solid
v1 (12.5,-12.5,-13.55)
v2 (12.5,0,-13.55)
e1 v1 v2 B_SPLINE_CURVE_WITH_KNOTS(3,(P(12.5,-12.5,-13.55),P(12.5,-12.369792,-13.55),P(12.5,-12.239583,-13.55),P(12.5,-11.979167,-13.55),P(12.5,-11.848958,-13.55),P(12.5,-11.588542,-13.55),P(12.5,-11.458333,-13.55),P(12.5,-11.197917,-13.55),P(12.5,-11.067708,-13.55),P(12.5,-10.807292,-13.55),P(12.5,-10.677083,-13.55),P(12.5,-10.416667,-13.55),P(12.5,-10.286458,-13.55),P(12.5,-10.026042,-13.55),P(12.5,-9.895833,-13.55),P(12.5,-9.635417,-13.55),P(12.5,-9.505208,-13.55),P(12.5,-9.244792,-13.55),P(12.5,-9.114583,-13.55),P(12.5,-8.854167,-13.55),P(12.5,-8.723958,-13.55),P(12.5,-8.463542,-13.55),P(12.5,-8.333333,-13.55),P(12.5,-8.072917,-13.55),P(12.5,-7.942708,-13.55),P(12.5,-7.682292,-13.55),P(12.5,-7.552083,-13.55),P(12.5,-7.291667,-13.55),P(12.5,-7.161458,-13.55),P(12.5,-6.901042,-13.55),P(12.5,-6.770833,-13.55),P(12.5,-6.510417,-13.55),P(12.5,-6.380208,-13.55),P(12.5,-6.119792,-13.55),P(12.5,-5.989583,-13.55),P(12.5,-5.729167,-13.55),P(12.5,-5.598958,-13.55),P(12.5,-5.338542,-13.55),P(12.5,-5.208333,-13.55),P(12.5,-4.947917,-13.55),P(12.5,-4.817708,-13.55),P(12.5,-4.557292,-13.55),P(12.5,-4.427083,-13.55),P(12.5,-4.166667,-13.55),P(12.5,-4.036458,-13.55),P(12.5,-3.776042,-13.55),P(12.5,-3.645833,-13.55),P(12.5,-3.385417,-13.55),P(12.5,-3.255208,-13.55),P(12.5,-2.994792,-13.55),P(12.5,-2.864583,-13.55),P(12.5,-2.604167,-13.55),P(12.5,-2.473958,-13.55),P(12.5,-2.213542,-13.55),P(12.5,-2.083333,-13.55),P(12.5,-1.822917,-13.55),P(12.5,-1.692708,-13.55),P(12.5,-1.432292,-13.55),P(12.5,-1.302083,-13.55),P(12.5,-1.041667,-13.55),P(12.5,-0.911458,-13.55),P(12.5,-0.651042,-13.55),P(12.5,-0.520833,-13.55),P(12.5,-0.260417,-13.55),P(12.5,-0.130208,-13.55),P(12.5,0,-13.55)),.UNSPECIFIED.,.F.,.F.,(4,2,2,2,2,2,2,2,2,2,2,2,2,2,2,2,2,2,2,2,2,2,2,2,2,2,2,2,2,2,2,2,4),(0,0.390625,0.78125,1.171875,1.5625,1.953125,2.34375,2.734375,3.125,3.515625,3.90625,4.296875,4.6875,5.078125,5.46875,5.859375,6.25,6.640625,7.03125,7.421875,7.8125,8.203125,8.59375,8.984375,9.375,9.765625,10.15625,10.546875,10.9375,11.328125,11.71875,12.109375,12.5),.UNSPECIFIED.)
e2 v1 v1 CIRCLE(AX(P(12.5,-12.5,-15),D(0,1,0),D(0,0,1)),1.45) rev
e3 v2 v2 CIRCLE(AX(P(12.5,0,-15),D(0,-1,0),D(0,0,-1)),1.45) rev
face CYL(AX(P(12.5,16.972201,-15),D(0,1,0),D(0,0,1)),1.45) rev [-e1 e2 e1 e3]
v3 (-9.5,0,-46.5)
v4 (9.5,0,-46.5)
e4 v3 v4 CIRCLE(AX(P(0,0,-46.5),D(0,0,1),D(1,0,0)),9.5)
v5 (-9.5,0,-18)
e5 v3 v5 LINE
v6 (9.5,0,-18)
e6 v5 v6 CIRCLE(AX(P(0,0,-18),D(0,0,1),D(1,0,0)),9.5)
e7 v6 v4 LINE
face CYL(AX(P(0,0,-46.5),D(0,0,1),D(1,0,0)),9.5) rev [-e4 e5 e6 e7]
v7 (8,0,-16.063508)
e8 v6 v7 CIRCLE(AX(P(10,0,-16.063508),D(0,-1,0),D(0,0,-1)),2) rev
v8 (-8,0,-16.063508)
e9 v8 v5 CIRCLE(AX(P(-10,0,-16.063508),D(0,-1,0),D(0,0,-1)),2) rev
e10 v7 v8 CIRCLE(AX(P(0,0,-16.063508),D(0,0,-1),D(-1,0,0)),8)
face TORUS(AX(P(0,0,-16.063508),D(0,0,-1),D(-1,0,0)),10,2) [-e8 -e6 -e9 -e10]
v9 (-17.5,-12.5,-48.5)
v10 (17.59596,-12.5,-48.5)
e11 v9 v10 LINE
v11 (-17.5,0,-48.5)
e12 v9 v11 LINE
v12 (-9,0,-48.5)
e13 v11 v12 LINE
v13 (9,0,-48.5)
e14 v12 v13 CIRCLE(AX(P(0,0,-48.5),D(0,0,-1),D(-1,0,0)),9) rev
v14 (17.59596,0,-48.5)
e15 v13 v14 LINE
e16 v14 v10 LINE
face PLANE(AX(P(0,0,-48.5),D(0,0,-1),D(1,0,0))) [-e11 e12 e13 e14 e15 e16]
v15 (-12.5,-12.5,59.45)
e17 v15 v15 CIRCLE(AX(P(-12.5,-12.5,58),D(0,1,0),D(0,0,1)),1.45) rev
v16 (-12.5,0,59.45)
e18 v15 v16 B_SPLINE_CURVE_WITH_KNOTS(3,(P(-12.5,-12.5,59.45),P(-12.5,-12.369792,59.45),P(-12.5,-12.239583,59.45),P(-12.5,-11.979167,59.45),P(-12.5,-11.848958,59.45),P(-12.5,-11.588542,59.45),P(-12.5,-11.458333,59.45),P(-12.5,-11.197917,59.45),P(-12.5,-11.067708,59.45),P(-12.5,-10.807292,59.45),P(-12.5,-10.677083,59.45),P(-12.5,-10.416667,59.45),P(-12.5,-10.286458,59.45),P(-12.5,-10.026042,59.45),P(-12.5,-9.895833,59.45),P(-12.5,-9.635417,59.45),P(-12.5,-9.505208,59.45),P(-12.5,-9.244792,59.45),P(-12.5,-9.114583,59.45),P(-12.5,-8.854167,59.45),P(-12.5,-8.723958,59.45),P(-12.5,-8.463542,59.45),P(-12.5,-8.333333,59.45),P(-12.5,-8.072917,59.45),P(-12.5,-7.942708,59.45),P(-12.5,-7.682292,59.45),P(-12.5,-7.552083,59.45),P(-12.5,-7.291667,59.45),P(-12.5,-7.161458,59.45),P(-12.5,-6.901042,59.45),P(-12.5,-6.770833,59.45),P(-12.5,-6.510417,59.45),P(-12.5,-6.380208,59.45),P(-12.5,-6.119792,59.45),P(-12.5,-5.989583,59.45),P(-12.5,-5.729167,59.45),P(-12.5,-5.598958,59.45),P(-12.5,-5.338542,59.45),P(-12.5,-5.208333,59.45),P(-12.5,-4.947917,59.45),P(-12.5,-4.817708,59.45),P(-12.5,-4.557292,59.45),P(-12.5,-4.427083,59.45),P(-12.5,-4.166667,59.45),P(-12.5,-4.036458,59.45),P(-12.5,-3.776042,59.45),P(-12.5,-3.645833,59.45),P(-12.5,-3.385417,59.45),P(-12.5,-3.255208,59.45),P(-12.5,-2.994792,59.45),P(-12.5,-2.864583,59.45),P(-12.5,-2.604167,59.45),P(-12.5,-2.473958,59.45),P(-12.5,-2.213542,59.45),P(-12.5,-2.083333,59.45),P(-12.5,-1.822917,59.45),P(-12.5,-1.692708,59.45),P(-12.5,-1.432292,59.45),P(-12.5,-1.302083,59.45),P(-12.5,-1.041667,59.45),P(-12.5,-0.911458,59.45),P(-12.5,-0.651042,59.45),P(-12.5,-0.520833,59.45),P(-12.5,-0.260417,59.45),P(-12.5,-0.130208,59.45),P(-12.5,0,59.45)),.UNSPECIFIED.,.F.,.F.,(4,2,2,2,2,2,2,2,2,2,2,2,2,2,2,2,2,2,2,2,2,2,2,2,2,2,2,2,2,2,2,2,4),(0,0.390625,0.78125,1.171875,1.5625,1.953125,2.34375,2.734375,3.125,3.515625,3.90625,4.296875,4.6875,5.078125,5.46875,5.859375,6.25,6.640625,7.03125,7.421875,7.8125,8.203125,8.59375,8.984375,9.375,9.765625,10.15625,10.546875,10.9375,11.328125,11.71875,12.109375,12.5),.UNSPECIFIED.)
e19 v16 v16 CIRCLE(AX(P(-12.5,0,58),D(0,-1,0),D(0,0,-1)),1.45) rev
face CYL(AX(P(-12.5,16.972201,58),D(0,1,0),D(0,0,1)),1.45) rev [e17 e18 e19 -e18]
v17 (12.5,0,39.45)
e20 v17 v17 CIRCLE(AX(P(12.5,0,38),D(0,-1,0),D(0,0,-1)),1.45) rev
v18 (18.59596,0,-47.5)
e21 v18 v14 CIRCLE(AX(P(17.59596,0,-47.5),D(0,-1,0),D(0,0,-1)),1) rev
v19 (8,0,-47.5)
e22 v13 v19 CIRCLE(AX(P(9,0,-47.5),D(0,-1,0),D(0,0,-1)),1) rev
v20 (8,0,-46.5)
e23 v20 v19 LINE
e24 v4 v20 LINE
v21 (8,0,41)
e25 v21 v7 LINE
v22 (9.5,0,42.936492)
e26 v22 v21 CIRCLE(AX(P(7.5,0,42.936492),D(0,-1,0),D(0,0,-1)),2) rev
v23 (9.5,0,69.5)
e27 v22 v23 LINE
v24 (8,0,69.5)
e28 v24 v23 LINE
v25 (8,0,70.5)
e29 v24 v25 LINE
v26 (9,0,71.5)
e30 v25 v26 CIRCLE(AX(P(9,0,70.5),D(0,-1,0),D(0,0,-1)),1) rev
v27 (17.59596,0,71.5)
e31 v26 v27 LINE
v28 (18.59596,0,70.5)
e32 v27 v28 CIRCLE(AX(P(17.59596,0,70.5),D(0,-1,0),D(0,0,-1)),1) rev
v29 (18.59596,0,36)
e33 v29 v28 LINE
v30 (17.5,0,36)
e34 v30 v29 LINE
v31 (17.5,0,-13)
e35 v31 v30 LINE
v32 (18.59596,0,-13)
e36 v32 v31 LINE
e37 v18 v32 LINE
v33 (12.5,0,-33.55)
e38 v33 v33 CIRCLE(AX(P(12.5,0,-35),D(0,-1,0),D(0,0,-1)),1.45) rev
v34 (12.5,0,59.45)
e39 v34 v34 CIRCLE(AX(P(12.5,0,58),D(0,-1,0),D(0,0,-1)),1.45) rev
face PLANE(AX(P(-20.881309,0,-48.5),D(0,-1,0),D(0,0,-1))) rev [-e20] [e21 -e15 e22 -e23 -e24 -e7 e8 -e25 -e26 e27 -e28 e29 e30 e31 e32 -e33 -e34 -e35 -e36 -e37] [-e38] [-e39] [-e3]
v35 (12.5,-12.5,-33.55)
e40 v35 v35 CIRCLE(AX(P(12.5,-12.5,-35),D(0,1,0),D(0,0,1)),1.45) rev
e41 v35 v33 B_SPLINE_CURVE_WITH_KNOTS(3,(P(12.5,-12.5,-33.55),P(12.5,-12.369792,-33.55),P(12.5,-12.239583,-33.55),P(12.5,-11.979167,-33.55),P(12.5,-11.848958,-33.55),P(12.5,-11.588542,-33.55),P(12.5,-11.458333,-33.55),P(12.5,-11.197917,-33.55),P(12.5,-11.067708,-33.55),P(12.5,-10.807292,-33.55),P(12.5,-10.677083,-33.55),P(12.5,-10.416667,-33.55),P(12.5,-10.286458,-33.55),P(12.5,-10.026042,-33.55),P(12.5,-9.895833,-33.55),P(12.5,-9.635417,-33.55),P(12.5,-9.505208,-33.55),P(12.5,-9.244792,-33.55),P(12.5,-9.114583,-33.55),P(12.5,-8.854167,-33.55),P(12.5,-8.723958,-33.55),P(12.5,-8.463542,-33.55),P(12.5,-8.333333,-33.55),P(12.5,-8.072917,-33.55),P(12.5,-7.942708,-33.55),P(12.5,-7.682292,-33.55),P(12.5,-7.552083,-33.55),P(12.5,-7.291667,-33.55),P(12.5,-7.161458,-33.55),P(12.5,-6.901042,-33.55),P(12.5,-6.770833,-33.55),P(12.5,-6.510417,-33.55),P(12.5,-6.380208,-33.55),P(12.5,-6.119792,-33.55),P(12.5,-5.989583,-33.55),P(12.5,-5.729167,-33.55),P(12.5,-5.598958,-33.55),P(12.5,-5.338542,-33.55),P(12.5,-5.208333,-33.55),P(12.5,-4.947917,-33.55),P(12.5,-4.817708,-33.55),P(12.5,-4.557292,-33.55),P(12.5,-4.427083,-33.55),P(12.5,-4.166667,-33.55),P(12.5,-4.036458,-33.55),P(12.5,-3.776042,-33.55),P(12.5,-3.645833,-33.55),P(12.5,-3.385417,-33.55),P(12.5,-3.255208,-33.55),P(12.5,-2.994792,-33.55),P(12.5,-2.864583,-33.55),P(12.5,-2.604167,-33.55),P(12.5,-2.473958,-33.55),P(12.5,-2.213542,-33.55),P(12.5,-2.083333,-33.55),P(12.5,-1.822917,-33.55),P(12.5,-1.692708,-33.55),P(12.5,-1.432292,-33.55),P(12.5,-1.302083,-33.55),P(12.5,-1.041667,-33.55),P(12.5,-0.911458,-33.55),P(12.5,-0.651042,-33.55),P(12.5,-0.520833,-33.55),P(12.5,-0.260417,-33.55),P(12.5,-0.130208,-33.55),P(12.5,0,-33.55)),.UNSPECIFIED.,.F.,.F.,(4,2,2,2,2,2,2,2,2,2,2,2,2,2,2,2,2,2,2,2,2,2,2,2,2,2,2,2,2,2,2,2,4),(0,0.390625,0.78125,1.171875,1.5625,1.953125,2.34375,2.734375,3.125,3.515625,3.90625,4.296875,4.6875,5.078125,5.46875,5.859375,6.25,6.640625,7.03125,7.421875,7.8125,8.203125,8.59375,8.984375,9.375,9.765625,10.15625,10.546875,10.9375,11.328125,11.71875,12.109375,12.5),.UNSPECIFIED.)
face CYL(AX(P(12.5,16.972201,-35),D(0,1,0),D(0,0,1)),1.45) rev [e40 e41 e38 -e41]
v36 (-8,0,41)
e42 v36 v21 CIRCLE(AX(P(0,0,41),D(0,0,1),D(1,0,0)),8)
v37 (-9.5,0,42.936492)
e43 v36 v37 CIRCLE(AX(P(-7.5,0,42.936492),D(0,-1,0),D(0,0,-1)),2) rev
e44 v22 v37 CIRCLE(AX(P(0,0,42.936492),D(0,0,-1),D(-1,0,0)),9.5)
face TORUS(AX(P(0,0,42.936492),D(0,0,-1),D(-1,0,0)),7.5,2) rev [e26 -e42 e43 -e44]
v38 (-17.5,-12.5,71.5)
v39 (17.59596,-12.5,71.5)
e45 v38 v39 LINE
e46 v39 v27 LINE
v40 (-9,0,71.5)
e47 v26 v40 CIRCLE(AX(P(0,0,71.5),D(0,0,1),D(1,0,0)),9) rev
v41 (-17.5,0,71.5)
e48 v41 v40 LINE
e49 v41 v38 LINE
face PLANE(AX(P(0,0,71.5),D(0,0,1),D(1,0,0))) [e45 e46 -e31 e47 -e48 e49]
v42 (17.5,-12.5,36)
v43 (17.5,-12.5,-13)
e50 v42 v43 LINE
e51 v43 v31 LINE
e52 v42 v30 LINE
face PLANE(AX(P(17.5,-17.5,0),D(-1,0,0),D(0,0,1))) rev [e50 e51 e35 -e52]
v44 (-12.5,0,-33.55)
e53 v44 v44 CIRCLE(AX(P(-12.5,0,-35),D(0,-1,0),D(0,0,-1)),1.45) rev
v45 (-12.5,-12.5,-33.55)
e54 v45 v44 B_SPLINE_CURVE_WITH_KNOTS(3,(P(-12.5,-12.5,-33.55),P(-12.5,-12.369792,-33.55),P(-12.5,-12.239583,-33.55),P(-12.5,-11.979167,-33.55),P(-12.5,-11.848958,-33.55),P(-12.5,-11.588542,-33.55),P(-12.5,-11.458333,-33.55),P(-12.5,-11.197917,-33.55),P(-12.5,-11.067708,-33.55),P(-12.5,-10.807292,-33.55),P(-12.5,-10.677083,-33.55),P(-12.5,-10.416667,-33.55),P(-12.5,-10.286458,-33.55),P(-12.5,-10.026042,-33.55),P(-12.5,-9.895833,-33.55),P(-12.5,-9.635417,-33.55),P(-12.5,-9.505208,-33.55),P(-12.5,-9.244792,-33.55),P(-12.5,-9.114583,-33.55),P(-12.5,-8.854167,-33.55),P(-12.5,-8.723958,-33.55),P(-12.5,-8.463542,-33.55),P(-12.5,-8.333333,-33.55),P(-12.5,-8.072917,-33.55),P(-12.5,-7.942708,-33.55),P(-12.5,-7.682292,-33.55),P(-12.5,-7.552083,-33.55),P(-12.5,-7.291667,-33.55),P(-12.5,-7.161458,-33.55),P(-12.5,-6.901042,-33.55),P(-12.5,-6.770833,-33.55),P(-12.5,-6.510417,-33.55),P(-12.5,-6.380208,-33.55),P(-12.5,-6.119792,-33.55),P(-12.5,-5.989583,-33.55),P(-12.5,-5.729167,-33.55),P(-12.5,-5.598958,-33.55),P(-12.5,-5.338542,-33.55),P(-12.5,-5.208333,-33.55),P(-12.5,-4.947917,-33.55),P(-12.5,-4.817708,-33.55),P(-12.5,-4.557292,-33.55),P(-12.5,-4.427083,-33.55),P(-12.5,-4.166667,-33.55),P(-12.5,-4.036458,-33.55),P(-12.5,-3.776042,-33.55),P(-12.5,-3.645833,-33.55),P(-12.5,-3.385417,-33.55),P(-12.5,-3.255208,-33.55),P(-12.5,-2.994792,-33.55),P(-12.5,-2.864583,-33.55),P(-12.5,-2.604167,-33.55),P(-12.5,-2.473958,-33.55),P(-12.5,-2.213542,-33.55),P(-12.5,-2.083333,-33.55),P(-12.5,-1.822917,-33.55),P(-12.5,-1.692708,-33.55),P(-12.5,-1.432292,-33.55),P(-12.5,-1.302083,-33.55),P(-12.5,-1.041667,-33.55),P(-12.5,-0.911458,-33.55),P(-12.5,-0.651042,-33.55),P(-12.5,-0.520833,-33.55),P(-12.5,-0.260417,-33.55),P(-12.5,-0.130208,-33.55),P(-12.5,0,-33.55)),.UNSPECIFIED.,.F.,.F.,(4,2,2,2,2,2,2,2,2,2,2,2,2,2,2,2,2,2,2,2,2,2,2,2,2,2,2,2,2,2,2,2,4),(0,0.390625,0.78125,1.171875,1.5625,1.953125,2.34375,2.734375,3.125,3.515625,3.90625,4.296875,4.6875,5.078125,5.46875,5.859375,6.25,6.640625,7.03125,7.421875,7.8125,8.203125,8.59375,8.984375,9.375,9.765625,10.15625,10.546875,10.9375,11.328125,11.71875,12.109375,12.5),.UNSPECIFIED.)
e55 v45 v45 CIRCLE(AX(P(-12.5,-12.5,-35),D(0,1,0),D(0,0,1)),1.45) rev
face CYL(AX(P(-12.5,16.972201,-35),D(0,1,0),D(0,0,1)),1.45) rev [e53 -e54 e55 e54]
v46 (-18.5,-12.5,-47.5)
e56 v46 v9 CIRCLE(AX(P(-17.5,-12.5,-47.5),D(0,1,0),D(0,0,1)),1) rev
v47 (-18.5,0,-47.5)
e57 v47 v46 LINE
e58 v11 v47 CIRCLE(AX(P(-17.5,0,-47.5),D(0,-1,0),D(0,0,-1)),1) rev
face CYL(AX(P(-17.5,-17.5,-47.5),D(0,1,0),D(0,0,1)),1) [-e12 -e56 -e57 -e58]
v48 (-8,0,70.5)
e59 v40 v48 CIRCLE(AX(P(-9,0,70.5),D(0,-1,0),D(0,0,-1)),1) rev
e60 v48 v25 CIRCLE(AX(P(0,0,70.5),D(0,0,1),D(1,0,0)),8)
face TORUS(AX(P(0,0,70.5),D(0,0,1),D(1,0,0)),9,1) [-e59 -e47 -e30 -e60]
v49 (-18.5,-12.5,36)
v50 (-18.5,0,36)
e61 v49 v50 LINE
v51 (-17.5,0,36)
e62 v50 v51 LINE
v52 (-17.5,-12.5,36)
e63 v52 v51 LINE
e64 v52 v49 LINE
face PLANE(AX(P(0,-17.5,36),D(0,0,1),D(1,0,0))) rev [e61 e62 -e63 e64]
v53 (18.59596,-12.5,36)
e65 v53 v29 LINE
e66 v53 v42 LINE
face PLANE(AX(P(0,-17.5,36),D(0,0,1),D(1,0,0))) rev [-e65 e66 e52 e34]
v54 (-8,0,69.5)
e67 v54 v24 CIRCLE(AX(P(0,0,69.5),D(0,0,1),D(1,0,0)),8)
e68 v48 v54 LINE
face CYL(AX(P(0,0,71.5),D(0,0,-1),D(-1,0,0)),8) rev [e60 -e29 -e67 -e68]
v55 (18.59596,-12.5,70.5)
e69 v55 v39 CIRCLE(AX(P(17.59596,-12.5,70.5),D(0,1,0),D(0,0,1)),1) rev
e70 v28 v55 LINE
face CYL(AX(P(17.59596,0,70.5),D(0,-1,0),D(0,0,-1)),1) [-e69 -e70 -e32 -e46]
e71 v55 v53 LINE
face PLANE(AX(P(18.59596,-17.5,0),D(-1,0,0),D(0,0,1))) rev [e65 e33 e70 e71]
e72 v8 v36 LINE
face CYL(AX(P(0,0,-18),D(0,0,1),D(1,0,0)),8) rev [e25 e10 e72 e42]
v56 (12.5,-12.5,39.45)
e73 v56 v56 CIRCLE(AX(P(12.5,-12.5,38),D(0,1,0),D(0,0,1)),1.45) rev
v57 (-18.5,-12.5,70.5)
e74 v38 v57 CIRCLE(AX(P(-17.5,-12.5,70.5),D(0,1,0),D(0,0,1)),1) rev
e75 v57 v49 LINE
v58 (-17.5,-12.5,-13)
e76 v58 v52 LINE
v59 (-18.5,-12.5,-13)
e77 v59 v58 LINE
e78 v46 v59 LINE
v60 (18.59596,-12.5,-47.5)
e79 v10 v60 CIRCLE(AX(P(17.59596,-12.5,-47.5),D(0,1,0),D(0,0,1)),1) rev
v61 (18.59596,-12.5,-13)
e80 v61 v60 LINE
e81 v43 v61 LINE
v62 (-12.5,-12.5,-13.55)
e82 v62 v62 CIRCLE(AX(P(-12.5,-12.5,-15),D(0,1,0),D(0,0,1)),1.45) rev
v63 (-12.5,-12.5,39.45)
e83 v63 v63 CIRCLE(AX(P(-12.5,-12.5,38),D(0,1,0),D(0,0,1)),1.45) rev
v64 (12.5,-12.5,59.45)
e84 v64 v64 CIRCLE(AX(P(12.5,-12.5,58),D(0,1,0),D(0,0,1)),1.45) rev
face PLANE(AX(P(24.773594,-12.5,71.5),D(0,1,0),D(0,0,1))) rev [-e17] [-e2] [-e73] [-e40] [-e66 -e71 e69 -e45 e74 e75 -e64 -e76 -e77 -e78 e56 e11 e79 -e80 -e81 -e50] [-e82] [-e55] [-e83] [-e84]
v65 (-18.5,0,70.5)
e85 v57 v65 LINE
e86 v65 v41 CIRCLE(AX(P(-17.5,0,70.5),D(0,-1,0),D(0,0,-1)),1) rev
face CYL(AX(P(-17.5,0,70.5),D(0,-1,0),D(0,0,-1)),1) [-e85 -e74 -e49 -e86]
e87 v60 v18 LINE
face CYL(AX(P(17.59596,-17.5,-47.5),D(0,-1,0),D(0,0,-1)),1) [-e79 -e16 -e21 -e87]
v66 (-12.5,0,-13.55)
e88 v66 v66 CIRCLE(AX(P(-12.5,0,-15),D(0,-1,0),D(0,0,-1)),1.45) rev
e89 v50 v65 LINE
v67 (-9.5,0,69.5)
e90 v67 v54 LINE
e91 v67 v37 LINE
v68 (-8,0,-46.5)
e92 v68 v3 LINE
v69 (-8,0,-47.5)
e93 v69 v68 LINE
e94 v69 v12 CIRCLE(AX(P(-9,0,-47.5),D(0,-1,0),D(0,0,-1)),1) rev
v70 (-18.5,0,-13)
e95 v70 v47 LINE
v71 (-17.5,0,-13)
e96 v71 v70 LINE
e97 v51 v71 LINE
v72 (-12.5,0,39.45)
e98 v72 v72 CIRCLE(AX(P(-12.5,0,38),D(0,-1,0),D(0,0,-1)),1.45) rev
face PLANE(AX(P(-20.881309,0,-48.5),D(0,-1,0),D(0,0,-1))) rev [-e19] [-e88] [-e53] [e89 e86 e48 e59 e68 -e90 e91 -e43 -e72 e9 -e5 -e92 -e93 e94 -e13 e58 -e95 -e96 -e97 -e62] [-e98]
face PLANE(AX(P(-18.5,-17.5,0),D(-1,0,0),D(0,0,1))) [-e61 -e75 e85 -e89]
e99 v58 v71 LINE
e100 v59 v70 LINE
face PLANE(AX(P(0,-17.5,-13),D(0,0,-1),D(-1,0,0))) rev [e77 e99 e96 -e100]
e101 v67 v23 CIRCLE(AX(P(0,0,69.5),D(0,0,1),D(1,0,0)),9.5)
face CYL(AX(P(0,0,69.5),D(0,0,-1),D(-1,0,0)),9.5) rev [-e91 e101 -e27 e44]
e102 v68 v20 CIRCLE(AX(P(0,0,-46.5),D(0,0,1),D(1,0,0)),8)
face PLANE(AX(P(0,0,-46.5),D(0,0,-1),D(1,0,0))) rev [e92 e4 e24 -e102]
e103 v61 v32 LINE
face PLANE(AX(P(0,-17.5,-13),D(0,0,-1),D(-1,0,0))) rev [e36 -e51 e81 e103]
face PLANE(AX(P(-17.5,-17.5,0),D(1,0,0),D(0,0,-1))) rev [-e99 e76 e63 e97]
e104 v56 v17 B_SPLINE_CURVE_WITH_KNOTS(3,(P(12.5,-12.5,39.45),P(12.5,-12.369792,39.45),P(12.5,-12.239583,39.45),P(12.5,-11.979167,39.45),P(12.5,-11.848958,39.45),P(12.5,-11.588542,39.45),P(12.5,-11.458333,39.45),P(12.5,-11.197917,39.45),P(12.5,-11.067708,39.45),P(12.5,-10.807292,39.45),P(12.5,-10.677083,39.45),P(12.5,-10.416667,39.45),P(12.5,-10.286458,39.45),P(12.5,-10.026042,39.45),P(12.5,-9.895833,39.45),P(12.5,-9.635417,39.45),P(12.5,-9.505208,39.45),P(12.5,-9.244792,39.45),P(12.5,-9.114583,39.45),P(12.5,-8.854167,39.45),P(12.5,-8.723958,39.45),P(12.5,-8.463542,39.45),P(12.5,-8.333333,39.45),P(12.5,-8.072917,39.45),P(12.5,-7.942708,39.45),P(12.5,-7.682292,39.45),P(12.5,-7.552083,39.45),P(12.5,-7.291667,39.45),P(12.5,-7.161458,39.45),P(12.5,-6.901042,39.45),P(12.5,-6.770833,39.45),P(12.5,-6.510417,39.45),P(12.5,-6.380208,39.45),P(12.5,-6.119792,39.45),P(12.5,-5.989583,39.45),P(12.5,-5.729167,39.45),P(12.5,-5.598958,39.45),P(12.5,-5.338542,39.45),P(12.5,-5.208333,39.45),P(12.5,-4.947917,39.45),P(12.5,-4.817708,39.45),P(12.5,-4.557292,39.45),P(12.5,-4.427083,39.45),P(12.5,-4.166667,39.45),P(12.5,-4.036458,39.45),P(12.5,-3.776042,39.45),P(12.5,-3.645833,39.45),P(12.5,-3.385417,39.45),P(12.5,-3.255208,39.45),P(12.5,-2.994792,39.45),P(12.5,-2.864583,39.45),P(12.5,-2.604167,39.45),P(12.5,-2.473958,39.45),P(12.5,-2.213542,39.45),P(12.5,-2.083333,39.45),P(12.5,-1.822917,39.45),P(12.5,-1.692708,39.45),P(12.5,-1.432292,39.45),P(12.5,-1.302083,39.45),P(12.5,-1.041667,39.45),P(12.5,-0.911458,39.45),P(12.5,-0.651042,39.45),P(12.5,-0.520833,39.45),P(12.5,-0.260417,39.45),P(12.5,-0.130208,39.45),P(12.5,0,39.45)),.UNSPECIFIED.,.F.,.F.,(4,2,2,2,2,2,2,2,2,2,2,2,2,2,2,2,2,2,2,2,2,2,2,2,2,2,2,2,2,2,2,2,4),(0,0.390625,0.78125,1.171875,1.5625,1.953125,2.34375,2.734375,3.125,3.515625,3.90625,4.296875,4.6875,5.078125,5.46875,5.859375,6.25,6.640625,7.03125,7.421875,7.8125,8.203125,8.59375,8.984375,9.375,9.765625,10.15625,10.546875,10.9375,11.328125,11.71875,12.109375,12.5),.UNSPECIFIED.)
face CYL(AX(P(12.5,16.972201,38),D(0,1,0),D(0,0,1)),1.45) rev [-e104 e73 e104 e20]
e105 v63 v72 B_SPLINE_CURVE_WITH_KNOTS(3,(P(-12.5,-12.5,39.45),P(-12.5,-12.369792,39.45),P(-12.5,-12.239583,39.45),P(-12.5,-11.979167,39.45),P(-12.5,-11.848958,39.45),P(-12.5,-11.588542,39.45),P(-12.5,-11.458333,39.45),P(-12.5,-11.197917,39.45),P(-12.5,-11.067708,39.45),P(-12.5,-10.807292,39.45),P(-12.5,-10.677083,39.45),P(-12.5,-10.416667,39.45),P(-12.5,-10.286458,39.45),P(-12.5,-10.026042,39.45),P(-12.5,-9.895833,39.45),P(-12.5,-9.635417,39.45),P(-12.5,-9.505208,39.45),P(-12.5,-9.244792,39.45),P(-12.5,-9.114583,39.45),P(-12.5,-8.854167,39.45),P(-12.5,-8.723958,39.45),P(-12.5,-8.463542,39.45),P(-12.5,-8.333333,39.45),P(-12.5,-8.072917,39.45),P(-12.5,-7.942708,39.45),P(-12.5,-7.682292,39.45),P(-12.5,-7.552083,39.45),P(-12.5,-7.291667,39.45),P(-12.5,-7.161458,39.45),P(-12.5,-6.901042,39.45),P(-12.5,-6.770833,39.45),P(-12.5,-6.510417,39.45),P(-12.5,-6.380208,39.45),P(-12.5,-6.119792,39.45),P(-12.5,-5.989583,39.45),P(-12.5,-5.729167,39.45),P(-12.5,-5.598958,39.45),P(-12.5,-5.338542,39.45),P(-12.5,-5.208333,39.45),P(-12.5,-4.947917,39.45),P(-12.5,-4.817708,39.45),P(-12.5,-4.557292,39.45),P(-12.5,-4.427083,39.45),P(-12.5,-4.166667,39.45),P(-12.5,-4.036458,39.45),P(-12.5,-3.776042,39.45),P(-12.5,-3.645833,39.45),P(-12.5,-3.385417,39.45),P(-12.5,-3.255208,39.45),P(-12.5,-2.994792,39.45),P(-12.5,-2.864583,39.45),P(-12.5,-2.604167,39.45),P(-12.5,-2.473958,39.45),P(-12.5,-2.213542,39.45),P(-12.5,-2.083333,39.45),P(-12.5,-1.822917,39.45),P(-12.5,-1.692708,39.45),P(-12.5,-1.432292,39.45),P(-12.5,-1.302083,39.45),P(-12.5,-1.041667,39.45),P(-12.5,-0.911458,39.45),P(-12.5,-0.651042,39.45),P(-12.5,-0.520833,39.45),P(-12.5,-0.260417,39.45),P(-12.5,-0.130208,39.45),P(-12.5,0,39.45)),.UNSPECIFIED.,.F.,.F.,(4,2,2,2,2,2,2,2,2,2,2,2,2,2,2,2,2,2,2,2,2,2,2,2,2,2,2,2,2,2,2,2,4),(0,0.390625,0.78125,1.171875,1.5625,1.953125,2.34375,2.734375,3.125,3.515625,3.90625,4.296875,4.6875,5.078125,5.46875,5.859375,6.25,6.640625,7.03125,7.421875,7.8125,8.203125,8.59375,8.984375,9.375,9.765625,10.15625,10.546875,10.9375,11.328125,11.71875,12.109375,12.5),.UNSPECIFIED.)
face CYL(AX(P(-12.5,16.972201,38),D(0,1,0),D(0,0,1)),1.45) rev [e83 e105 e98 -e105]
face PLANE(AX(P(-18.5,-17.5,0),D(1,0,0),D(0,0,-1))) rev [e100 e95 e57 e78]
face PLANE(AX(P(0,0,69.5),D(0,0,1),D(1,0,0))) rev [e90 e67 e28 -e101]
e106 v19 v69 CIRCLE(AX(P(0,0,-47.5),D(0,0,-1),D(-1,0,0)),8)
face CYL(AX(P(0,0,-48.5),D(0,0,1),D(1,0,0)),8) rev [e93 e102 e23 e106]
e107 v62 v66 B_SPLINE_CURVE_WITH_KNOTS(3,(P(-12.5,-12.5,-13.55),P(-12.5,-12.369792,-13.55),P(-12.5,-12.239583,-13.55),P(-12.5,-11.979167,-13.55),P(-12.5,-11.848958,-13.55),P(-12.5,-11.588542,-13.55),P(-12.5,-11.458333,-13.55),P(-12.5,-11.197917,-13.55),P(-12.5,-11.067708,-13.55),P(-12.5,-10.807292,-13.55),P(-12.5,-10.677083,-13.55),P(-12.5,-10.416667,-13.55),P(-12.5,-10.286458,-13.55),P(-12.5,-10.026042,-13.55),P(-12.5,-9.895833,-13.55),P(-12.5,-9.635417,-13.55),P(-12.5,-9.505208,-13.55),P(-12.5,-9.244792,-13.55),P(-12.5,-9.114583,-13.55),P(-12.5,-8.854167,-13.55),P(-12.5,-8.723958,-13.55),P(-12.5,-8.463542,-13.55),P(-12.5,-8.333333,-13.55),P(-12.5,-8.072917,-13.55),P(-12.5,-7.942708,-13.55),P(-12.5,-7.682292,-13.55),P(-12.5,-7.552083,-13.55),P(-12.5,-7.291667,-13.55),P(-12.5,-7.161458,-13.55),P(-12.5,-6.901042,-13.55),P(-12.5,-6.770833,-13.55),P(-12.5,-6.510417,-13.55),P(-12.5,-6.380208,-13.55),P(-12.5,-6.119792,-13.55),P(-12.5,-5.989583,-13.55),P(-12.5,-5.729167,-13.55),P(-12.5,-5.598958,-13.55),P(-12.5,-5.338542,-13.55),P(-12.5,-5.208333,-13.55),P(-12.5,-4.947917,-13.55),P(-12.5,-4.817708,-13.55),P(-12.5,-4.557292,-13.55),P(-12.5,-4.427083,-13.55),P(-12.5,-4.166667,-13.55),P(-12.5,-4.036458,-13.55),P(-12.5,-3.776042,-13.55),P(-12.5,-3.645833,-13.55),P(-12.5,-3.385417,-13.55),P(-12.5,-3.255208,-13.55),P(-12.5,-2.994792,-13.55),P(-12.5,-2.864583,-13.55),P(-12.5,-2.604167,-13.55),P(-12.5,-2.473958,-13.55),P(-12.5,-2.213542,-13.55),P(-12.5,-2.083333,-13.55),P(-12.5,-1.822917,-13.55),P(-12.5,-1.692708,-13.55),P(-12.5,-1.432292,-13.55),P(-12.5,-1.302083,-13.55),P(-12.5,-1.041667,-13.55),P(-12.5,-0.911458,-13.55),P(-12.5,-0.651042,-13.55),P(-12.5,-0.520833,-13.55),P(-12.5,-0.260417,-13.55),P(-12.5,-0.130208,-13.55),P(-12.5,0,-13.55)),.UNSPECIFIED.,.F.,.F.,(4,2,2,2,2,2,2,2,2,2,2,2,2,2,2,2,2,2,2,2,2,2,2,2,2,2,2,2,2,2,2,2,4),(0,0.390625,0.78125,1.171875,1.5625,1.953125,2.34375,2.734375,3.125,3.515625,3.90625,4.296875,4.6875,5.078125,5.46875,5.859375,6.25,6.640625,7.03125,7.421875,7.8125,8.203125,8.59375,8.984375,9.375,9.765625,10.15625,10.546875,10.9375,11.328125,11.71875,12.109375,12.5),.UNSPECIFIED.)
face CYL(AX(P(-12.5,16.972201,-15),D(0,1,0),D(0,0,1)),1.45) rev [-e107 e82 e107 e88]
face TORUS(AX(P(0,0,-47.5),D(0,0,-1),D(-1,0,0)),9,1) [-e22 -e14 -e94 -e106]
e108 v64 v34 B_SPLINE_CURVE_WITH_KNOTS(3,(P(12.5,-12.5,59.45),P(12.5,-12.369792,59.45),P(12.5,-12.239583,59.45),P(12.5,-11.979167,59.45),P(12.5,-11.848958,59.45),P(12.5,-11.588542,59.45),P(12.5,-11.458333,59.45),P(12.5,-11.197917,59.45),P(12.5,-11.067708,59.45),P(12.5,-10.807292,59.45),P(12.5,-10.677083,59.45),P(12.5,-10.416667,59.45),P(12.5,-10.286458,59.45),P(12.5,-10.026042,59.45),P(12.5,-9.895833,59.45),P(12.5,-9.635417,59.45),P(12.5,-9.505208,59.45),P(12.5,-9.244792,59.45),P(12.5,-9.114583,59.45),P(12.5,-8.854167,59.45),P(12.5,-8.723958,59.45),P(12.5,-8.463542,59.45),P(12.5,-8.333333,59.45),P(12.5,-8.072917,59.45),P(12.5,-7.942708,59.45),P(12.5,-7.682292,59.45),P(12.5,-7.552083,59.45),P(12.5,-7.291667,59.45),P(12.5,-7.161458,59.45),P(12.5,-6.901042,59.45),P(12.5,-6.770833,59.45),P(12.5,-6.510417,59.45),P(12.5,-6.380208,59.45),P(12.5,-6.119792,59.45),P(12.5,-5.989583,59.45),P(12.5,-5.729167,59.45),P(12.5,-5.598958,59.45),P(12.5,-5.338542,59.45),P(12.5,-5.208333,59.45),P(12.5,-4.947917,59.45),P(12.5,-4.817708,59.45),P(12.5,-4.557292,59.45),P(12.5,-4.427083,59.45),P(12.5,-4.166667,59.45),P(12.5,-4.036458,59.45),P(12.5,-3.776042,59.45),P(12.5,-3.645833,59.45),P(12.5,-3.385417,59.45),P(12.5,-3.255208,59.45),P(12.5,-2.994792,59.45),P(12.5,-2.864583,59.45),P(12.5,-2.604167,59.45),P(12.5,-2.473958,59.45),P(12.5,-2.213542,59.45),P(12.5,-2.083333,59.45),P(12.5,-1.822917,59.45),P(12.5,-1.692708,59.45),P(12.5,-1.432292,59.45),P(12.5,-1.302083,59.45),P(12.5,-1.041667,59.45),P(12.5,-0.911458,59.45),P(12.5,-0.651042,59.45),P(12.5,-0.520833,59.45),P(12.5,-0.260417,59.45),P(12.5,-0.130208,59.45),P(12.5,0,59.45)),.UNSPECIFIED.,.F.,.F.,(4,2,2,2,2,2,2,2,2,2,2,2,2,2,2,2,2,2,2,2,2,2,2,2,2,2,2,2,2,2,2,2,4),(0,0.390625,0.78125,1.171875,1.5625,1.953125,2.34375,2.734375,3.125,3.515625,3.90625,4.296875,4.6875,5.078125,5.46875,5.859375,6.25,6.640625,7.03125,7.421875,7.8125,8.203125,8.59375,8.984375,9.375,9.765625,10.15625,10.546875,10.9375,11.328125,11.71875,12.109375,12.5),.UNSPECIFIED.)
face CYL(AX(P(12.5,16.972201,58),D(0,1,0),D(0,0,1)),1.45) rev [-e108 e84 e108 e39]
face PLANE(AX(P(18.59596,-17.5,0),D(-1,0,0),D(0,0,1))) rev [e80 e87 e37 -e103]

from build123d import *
from build123d.topology import SkipClean

# Parameters (mm, degrees)
BOSS_EXTRUDE1_DEPTH      = 41
BOSS_EXTRUDE1_DEPTH_BACK = 18
SKETCH2_R                = 8.000000000000004
SKETCH3_R                = 9.5
BOSS_EXTRUDE2_DEPTH      = 28.5
BOSS_EXTRUDE3_DEPTH      = 5
BOSS_EXTRUDE4_DEPTH      = 25.451834
M3_5_TAPPED_HOLE1_D      = 2.9
FILLET2_R                = 2
SKETCH14_R               = 8.000000000000004
BOSS_EXTRUDE5_DEPTH      = 2
FILLET10_R               = 1
FILLET10_OF_MIRROR2_R    = 1
FILLET11_R               = 1
FILLET12_R               = 2
SKETCH15_W               = 47.04564696040835
SKETCH15_H               = 19.155839546122916
CUT_EXTRUDE2_DEPTH       = 123.75548779255048
SKETCH16_W               = 50.32184914639417
SKETCH16_H               = 9.010919354068848
CUT_EXTRUDE3_DEPTH       = 123.68683594132897


# Some blends are built 0.0001 mm under size
with BuildPart() as part:
    # Sketch2 → Boss-Extrude1 (new, two sides: drawn at the far end of the back side and taken through both)
    with BuildSketch(Plane.XY.offset(-BOSS_EXTRUDE1_DEPTH_BACK)):
        with BuildLine():
            Line((-12.5, -12.500000000000002), (12.5, -12.500000000000002))
            Line((12.5, -12.500000000000002), (12.5, 5.999999999999994))
            Line((12.5, 5.999999999999994), (12.5, 12.951833846988604))
            ThreePointArc((12.5, 12.951833846988604), (9.463639319119588, 15.311418315675832), (5.995365002334926, 16.97220075561143))
            Line((5.995365002334926, 16.97220075561143), (-1.0000000000000027, 16.97220075561143))
            Line((-1.0000000000000027, 16.97220075561143), (-5.995365002334937, 16.972200755611425))
            ThreePointArc((-5.995365002334937, 16.972200755611425), (-9.463639319119597, 15.311418315675827), (-12.5, 12.951833846988608))
            Line((-12.5, 12.951833846988608), (-12.5, 6.000000000000001))
            Line((-12.5, 6.000000000000001), (-12.5, -12.500000000000002))
        make_face()
        Circle(SKETCH2_R, mode=Mode.SUBTRACT)
    extrude(amount=BOSS_EXTRUDE1_DEPTH + BOSS_EXTRUDE1_DEPTH_BACK)

    # Sketch3 → Boss-Extrude2 (add)
    with BuildSketch(Plane.XY.offset(41)):
        with BuildLine():
            Line((-1.0000000000000016, 17.97498435543818), (0.727272727272726, 17.97498435543818))
            Line((0.727272727272726, 17.97498435543818), (8.769260939312526, 17.974984355438174))
            ThreePointArc((8.769260939312526, 17.974984355438174), (11.304195151298408, 16.498944571740374), (13.595959595959597, 14.667988364633844))
            Line((13.595959595959597, 14.667988364633844), (13.595959595959597, 6.224872228225638))
            Line((13.595959595959597, 6.224872228225638), (13.595959595959597, -12.5))
            Line((13.595959595959597, -12.5), (-13.500000000000002, -12.500000000000004))
            Line((-13.500000000000002, -12.500000000000004), (-13.500000000000002, 6.223411383455548))
            Line((-13.500000000000002, 6.223411383455548), (-13.500000000000002, 14.756354563373698))
            ThreePointArc((-13.500000000000002, 14.756354563373698), (-11.250328445445001, 16.535722236104803), (-8.769260939312526, 17.97498435543818))
            Line((-8.769260939312526, 17.97498435543818), (-1.0000000000000016, 17.97498435543818))
        make_face()
        with Locations(Location((-1.73e-15, 0, 0), (0, 0, 180))):
            Circle(SKETCH3_R, mode=Mode.SUBTRACT)
    boss_extrude2 = extrude(amount=BOSS_EXTRUDE2_DEPTH)

    # Mirror1: Boss-Extrude2 across plane
    add(boss_extrude2.mirror(Plane.XY.offset(11.5)))

    # Sketch4 → Boss-Extrude3 (add)
    with BuildSketch(Plane.XZ.offset(12.500000000000002)):
        Polygon((-13.500000000000002, 41), (-13.500000000000002, 69.5), (-18.500000000000004, 69.5), (-18.500000000000004, 42.75), (-18.500000000000004, 36.00000000000001), (-17.5, 36.00000000000001), (-17.5, -13), (-18.500000000000004, -13.000000000000002), (-18.500000000000004, -46.5), (-13.500000000000002, -46.5), (-13.500000000000002, -18.000000000000004), (-12.499999999999998, -18.000000000000004), (-12.5, 41), align=None)
        Polygon((18.595959595959595, 69.5), (13.595959595959597, 69.5), (13.595959595959597, 41), (12.5, 41), (12.5, -18.000000000000004), (13.595959595959597, -18.000000000000004), (13.595959595959597, -46.5), (18.5959595959596, -46.5), (18.595959595959595, -13), (17.5, -13.000000000000002), (17.5, 36.00000000000001), (18.595959595959595, 36.00000000000001), (18.595959595959595, 42.75), align=None)
        Polygon((13.595959595959597, -18.000000000000004), (12.5, -18.000000000000004), (12.5, 41), (13.595959595959597, 41), (13.595959595959597, 69.5), (-13.500000000000002, 69.5), (-13.500000000000002, 41), (-12.5, 41), (-12.499999999999998, -18.000000000000004), (-13.500000000000002, -18.000000000000004), (-13.500000000000002, -46.5), (13.595959595959597, -46.5), align=None)
    extrude(amount=BOSS_EXTRUDE3_DEPTH)

    # Sketch5 → Boss-Extrude4 (add)
    with BuildSketch(Plane(origin=(0, -12.500000000000002, 0), x_dir=(1, 0, 0), z_dir=(0, 1, 0))):
        Polygon((13.595959595959597, -41), (13.595959595959597, -69.5), (18.595959595959595, -69.5), (18.595959595959595, -36.00000000000001), (17.5, -36.00000000000001), (17.5, 13.000000000000002), (18.595959595959595, 13.000000000000002), (18.595959595959595, 46.5), (13.595959595959597, 46.5), (13.595959595959597, 18.000000000000004), (12.5, 18.000000000000004), (12.5, -41), align=None)
        Polygon((-18.500000000000004, -69.5), (-13.500000000000002, -69.5), (-13.500000000000002, -41), (-12.5, -41), (-12.499999999999998, 18.000000000000004), (-13.500000000000002, 18.000000000000004), (-13.500000000000002, 46.5), (-18.5, 46.5), (-18.500000000000004, 13.000000000000002), (-17.5, 13.000000000000002), (-17.5, -36.00000000000001), (-18.500000000000004, -36.00000000000001), align=None)
    extrude(amount=BOSS_EXTRUDE4_DEPTH)

    # M3.5 Tapped Hole1 (through all)
    with Locations(Plane(origin=(-1.179e-14, 16.97220075561143, 0), x_dir=(1, 6.9e-16, 0), z_dir=(-6.9e-16, 1, 0))):
        with Locations((-12.5, 15), (12.5, 15), (12.5, 35), (-12.5, 35)):
            m3_5_tapped_hole1 = Hole(M3_5_TAPPED_HOLE1_D / 2)

    # Fillet2
    fillet2_edges = [part.edges().sort_by_distance(p)[0] for p in [
        (18.595959595959595, 12.951834, -29.75),
        (-18.5, 12.951834, -29.75),
    ]]
    fillet(fillet2_edges, radius=FILLET2_R - 0.0001)  # a hair under: the kernel refuses the full size

    # Sketch14 → Boss-Extrude5 (add)
    with SkipClean():  # the faces are left unmerged after this step: merging them gives an invalid solid
        with BuildSketch(Plane.XY.offset(69.5)):
            with BuildLine():
                Line((13.595959595959597, 12.951833846988603), (-13.500000000000002, 12.951833846988603))
                Line((-13.500000000000002, 12.951833846988603), (-16.5, 12.951833846988603))
                ThreePointArc((-16.5, 12.951833846988604), (-17.914213562373096, 12.366047409361698), (-18.5, 10.951833846988603))
                Line((-18.500000000000004, 10.951833846988603), (-18.500000000000004, -17.5))
                Line((-18.500000000000004, -17.5), (18.595959595959595, -17.5))
                Line((18.595959595959595, -17.5), (18.595959595959595, 10.951833846988603))
                ThreePointArc((18.595959595959595, 10.951833846988603), (18.01017315833269, 12.366047409361698), (16.595959595959595, 12.951833846988603))
                Line((16.595959595959595, 12.951833846988604), (13.595959595959597, 12.951833846988603))
            make_face()
            Circle(SKETCH14_R, mode=Mode.SUBTRACT)
        boss_extrude5 = extrude(amount=BOSS_EXTRUDE5_DEPTH)

    # Fillet10
    fillet10_edges = [part.edges().sort_by_distance(p)[0] for p in [
        (0.04797979797979934, 12.951833846988603, 71.5),
        (-8.000000000000004, 9.8e-16, 71.5),
        (-17.914213562373096, 12.366047409361698, 71.5),
        (-18.500000000000004, -3.2740830765056987, 71.5),
        (0.04797979797979579, -17.5, 71.5),
        (18.595959595959595, -3.2740830765056987, 71.5),
        (18.01017315833269, 12.366047409361698, 71.5),
    ]]
    fillet(fillet10_edges, radius=FILLET10_R)

    # Mirror2: Boss-Extrude5 across plane
    with SkipClean():  # the faces are left unmerged after this step: merging them gives an invalid solid
        add(boss_extrude5.mirror(Plane.XY.offset(11.5)))

    # Fillet10 of Mirror2
    fillet10_of_mirror2_edges = [part.edges().sort_by_distance(p)[0] for p in [
        (0.04797979797979934, 12.951833846988603, -48.5),
        (-8.000000000000004, 9.8e-16, -48.5),
        (-17.914213562373096, 12.366047409361698, -48.5),
        (-18.500000000000004, -3.2740830765056987, -48.5),
        (0.04797979797979579, -17.5, -48.5),
        (18.595959595959595, -3.2740830765056987, -48.5),
        (18.01017315833269, 12.366047409361698, -48.5),
    ]]
    fillet(fillet10_of_mirror2_edges, radius=FILLET10_OF_MIRROR2_R)

    # Fillet11
    fillet11_edges = [part.edges().sort_by_distance(p)[0] for p in [
        (11.304195151298412, 16.498944571740378, 69.5),
        (1.78e-15, 17.974984355438178, 69.5),
        (-11.250328445445, 16.535722236104803, 69.5),
        (-11.250328445445, 16.535722236104803, -46.5),
        (1.78e-15, 17.974984355438178, -46.5),
        (11.304195151298412, 16.498944571740378, -46.5),
    ]]
    fillet(fillet11_edges, radius=FILLET11_R)

    # Fillet12
    # the kernel refuses this fillet: 2 mm, written as the material it adds along each edge
    with BuildSketch(Plane(origin=(-1.73e-15, 0, 41), x_dir=(-1, 1.2e-16, 0), z_dir=(1.2e-16, 1, 0))) as fillet12_piece_1:
        with BuildLine():
            CenterArc((7.5, 1.9364916731037098), FILLET12_R, 284.47751218593, 75.52248781407002)
            Line((8.000000000000004, 0), (8.010000000000003, -0.03872983346207093))
            ThreePointArc((8.010000000000003, -0.03872983346207093), (8.750000000000002, -0.03999999999999915), (9.5, -0.03999999999999915))
            Line((9.5, -0.03999999999999915), (9.54, 0))
            Line((9.54, 0), (9.54, 1.9364916731037098))
            Line((9.54, 1.9364916731037098), (9.5, 1.9364916731037098))
        make_face()
    revolve(axis=Axis((-1.73e-15, 0, 41), (0, 0, 1)))
    # the kernel refuses this fillet: 2 mm, written as the material it takes off along each edge
    with BuildSketch(Plane(origin=(-1.73e-15, 0, -18), x_dir=(1, 0, 0), z_dir=(0, -1, 0))) as fillet12_2_piece_1:
        with BuildLine():
            CenterArc((10.000000000000004, 1.9364916731037063), FILLET12_R, 180, 75.52248781406996)
            Line((8.000000000000004, 1.9364916731037063), (7.9600000000000035, 1.9364916731037063))
            Line((7.9600000000000035, 1.9364916731037063), (7.9600000000000035, 0))
            Line((7.9600000000000035, 0), (8.000000000000004, -0.03999999999999915))
            ThreePointArc((8.000000000000004, -0.03999999999999915), (8.750000000000002, -0.03999999999999915), (9.49, -0.03872983346207448))
            Line((9.49, -0.03872983346207448), (9.5, 0))
        make_face()
    revolve(axis=Axis((-1.73e-15, 0, -18), (0, 0, 1)), mode=Mode.SUBTRACT)

    # Mirror3: M3.5 Tapped Hole1 across plane
    with SkipClean():  # the faces are left unmerged after this step: merging them gives an invalid solid
        add(m3_5_tapped_hole1.mirror(Plane.XY.offset(11.5)), mode=Mode.SUBTRACT)

    # Sketch15 → Cut-Extrude2 (cut, through all)
    with BuildSketch(Plane.XY.offset(71.50000000000001)):
        with Locations((2.6415149640881275, 9.577919773061458)):
            Rectangle(SKETCH15_W, SKETCH15_H)
    extrude(amount=-CUT_EXTRUDE2_DEPTH, mode=Mode.SUBTRACT)

    # Sketch16 → Cut-Extrude3 (cut, through all)
    with BuildSketch(Plane(origin=(0, 0, -48.50000000000001), x_dir=(-1, 0, 0), z_dir=(0, 0, -1))):
        with Locations((0.38733031574332877, -17.005459677034427)):
            Rectangle(SKETCH16_W, SKETCH16_H)
    extrude(amount=-CUT_EXTRUDE3_DEPTH, mode=Mode.SUBTRACT)


solid = part.part
